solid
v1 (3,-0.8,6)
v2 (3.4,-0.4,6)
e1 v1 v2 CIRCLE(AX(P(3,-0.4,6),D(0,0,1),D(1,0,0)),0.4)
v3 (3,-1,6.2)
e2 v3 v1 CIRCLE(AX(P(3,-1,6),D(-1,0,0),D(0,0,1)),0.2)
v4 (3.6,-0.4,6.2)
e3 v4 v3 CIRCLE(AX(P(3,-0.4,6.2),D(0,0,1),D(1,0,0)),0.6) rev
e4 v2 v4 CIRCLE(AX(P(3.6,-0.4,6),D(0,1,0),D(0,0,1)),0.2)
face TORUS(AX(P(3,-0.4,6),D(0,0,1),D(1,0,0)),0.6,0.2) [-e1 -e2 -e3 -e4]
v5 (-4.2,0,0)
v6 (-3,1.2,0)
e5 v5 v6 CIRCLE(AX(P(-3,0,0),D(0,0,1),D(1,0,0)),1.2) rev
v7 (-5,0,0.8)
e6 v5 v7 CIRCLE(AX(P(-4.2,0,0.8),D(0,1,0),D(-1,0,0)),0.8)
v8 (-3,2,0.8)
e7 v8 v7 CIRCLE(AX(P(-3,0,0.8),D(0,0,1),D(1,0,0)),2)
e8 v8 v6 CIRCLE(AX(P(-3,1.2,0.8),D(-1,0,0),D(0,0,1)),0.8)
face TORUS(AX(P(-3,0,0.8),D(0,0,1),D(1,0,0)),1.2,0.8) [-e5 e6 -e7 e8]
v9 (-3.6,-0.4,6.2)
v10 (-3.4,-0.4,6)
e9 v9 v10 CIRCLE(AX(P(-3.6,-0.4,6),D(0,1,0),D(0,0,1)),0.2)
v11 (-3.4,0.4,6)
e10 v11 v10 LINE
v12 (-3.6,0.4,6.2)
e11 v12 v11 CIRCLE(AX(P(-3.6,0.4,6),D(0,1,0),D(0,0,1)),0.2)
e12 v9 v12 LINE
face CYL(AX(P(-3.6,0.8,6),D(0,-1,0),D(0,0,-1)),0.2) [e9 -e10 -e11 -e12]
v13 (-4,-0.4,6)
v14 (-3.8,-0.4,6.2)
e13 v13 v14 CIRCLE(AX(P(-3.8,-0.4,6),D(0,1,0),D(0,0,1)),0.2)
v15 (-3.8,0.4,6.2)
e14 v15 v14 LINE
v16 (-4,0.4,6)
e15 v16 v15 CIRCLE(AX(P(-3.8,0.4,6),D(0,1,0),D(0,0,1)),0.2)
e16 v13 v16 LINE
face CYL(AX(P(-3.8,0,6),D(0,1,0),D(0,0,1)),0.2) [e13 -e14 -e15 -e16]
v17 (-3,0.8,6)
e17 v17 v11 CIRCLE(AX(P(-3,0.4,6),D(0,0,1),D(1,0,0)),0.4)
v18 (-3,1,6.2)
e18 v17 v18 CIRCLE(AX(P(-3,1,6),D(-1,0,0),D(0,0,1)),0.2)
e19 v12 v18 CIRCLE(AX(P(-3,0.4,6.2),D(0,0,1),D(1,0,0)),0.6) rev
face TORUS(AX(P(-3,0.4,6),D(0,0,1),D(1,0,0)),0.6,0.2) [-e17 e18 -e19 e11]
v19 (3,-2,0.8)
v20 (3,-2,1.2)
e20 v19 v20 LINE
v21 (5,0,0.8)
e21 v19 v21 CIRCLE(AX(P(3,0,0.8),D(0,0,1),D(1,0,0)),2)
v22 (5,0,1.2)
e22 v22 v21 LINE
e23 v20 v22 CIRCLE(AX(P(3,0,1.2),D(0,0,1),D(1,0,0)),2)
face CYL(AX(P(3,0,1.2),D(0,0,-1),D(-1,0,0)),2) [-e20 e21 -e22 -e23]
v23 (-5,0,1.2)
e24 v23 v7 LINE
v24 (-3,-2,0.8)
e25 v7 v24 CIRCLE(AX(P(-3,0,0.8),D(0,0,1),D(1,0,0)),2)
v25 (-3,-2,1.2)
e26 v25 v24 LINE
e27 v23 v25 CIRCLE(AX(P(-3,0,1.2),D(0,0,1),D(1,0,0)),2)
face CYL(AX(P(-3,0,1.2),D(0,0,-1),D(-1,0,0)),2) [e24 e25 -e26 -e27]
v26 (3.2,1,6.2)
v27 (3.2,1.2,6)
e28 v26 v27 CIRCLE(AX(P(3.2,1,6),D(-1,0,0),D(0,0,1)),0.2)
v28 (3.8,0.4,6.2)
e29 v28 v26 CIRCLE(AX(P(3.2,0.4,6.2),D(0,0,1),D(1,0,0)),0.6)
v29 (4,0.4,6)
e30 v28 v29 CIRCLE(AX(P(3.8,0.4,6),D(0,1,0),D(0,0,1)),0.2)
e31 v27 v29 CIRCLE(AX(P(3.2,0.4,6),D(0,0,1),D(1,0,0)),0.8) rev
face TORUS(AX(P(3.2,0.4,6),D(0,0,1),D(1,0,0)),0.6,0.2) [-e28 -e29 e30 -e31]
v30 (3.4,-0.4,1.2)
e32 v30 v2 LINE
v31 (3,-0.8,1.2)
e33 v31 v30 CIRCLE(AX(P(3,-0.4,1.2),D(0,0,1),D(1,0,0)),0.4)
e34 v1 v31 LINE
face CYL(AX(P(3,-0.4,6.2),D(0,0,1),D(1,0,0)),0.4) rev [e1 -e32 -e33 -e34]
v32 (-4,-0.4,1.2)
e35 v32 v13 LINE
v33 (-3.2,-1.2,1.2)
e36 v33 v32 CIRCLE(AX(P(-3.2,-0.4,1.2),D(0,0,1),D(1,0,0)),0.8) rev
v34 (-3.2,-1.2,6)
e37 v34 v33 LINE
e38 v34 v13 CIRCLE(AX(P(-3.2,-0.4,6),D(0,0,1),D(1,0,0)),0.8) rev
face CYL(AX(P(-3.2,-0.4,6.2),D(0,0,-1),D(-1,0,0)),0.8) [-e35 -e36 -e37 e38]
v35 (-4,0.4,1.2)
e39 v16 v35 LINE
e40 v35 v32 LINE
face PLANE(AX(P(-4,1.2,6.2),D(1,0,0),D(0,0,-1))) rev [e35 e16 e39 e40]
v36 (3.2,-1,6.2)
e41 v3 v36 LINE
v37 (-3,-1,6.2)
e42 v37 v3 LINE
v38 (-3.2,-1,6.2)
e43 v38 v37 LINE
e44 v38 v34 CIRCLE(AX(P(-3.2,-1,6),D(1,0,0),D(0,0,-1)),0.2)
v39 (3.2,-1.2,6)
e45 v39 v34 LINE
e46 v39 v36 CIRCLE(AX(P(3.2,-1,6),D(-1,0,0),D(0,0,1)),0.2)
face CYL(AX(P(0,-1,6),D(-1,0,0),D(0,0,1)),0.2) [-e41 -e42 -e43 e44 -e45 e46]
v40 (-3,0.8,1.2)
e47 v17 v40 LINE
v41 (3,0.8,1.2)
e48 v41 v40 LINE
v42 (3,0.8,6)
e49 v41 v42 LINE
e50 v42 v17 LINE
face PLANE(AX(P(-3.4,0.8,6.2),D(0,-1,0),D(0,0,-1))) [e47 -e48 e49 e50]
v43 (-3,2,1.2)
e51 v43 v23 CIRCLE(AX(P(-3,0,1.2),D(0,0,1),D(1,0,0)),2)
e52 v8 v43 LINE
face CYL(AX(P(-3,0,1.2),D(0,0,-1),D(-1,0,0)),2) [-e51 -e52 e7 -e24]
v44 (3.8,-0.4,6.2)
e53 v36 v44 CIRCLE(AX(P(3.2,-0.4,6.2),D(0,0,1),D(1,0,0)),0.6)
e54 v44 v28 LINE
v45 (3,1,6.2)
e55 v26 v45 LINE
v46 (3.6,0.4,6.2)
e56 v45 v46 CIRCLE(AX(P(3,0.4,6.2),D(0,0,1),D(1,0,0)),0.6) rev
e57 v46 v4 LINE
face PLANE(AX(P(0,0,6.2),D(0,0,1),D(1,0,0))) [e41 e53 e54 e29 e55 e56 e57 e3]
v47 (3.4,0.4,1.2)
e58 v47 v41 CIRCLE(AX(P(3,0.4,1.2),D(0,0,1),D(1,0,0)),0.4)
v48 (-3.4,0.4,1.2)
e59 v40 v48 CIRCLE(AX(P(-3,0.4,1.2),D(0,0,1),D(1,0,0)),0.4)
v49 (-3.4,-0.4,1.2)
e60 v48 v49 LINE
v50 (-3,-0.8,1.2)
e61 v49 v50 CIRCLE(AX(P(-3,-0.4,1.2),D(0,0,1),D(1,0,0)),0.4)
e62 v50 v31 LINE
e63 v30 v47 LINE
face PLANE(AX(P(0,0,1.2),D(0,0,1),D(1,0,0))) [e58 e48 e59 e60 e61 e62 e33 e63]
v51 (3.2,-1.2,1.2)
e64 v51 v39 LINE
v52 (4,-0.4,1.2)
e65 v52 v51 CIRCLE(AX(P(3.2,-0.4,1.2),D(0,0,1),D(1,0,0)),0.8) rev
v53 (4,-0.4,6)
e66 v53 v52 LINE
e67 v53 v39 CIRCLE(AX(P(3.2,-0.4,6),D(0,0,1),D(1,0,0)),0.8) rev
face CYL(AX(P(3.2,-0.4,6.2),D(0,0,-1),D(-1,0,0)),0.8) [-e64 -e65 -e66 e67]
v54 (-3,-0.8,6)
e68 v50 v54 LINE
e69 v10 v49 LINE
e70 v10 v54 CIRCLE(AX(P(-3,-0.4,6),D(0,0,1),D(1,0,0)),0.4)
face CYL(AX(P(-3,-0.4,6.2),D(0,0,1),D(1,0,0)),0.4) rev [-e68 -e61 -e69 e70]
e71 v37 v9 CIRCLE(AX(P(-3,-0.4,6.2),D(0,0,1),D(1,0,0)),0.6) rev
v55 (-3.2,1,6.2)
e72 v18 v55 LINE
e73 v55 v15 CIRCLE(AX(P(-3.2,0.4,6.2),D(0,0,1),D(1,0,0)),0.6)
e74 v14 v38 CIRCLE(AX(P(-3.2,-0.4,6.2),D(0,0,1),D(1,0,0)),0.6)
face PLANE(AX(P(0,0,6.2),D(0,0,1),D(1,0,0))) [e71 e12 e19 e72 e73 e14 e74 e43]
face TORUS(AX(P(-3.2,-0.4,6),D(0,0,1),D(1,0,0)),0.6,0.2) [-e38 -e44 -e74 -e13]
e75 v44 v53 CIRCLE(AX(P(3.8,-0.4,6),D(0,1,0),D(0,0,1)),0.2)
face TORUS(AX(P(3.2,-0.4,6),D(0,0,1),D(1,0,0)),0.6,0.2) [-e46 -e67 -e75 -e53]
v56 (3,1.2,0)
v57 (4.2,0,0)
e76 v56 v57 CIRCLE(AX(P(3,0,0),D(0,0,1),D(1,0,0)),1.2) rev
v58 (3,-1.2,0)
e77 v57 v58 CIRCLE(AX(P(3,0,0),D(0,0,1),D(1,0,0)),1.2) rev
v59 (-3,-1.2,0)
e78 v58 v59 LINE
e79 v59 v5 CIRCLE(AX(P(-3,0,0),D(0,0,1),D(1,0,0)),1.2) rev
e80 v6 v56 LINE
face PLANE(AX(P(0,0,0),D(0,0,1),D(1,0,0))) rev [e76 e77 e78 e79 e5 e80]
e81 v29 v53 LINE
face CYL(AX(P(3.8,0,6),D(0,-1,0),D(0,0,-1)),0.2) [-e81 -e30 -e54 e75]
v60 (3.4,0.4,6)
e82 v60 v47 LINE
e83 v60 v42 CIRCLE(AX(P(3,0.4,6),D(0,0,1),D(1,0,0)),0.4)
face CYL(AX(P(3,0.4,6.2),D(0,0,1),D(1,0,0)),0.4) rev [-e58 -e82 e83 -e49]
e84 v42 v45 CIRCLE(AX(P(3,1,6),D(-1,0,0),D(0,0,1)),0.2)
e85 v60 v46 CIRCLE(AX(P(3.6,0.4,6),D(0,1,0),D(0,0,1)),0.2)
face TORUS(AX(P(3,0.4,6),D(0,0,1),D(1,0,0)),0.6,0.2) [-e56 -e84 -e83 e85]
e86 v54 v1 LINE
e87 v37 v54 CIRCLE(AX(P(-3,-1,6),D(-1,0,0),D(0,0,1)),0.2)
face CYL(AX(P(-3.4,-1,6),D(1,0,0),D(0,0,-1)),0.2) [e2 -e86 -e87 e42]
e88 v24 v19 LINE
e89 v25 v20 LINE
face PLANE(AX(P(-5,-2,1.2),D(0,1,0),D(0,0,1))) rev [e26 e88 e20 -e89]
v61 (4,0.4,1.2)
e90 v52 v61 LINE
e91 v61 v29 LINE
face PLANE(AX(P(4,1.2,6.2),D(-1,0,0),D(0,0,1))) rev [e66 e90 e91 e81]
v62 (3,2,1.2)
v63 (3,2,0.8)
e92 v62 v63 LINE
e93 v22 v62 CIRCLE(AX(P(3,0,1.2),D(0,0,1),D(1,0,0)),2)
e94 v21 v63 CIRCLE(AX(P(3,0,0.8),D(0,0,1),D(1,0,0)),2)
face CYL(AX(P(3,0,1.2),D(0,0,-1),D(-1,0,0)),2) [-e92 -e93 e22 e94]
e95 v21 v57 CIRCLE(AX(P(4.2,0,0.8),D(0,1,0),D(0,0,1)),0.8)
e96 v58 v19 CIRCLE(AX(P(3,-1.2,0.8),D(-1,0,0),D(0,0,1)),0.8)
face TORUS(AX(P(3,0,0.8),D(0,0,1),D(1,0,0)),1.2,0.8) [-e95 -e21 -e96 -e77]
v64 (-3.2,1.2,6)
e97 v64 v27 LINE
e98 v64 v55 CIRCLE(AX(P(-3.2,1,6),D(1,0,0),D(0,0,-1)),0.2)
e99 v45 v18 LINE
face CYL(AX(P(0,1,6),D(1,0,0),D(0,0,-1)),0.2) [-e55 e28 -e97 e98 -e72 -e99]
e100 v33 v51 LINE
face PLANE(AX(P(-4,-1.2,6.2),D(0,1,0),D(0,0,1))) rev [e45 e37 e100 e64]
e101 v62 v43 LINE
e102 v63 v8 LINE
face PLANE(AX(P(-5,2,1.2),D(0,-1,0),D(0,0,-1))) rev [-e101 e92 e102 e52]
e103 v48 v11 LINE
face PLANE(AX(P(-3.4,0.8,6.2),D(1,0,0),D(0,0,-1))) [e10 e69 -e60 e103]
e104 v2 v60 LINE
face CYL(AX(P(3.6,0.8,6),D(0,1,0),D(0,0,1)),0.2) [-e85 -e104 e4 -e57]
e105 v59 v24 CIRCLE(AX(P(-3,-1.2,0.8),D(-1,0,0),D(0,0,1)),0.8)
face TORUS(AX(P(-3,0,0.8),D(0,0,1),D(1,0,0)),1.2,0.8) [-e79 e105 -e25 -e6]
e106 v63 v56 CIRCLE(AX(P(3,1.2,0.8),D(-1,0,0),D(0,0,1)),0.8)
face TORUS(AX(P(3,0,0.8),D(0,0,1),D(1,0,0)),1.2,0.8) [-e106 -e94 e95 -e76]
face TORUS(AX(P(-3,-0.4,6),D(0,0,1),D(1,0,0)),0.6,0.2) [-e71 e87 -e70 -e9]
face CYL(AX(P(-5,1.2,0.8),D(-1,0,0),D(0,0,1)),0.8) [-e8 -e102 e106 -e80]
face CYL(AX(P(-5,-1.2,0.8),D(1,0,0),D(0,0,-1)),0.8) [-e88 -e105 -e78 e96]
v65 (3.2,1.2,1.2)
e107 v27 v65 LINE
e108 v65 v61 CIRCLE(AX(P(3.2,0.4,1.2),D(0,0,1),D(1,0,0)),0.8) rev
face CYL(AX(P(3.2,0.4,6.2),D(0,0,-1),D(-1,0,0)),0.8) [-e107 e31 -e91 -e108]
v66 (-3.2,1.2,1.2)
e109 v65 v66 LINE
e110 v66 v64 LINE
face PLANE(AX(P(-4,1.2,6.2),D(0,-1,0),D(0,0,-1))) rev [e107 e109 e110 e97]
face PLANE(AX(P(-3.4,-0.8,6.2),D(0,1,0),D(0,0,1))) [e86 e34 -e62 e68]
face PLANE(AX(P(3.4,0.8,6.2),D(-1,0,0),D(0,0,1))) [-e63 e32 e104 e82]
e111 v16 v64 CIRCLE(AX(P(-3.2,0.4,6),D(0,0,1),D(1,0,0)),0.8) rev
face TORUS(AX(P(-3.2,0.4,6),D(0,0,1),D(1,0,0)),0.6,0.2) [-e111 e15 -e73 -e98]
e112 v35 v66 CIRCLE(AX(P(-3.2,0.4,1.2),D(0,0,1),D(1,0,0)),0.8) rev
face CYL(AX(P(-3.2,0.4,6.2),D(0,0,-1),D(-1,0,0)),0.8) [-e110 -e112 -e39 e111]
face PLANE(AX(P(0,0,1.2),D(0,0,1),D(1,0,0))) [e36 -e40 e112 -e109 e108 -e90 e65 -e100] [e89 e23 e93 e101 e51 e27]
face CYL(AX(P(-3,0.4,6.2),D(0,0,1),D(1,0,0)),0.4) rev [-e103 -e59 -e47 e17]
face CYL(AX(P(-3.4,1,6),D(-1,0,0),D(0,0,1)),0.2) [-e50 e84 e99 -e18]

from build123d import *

# Parameters (mm, degrees)
SKETCH_1_W      = 10
SKETCH_1_H      = 4
EXTRUDE_1_DEPTH = 1.2
SKETCH_2_W      = 8
SKETCH_2_H      = 2.4
SKETCH_2_W_2    = 6.8
SKETCH_2_H_2    = 1.6
EXTRUDE_2_DEPTH = 5
FILLET_1_R      = 2
FILLET_2_R      = 0.8
FILLET_3_R      = 0.8
FILLET_4_R      = 0.4
FILLET_5_R      = 0.2


with BuildPart() as part:
    # Эскиз1 → Бобышка-Вытянуть1 (new body)
    with BuildSketch(Plane.XY):
        Rectangle(SKETCH_1_W, SKETCH_1_H)
    extrude(amount=EXTRUDE_1_DEPTH)

    # Эскиз2 → Бобышка-Вытянуть2 (add)
    with BuildSketch(Plane.XY.offset(1.2)):
        Rectangle(SKETCH_2_W, SKETCH_2_H)
        Rectangle(SKETCH_2_W_2, SKETCH_2_H_2, mode=Mode.SUBTRACT)
    extrude(amount=EXTRUDE_2_DEPTH)

    # Скругление1
    fillet_1_edges = [part.edges().sort_by_distance(p)[0] for p in [
        (5, 2, 0.6),
        (5, -2, 0.6),
        (-5, -2, 0.6),
        (-5, 2, 0.6),
    ]]
    fillet(fillet_1_edges, radius=FILLET_1_R - 0.0001)  # a hair under: the kernel refuses the full size

    # Скругление2
    fillet_2_edges = [part.edges().sort_by_distance(p)[0] for p in [
        (0, 2, 0),
        (0, -2, 0),
        (-4.414242852, 1.414242852, 0),
        (-4.414242852, -1.414242852, 0),
        (4.414242852, -1.414242852, 0),
        (4.414242852, 1.414242852, 0),
    ]]
    fillet(fillet_2_edges, radius=FILLET_2_R)

    # Скругление3
    fillet_3_edges = [part.edges().sort_by_distance(p)[0] for p in [
        (4, -1.2, 3.7),
        (4, 1.2, 3.7),
        (-4, 1.2, 3.7),
        (-4, -1.2, 3.7),
    ]]
    fillet(fillet_3_edges, radius=FILLET_3_R)

    # Скругление4
    fillet_4_edges = [part.edges().sort_by_distance(p)[0] for p in [
        (3.4, 0.8, 3.7),
        (-3.4, 0.8, 3.7),
        (-3.4, -0.8, 3.7),
        (3.4, -0.8, 3.7),
    ]]
    fillet(fillet_4_edges, radius=FILLET_4_R)

    # Скругление5
    fillet_5_edges = [part.edges().sort_by_distance(p)[0] for p in [
        (-3.4, 0, 6.2),
        (0, -0.8, 6.2),
        (3.4, 0, 6.2),
        (0, 0.8, 6.2),
        (-3.282842712, -0.682842712, 6.2),
        (3.282842712, -0.682842712, 6.2),
        (3.282842712, 0.682842712, 6.2),
        (-3.282842712, 0.682842712, 6.2),
        (0, -1.2, 6.2),
        (-4, 0, 6.2),
        (4, 0, 6.2),
        (0, 1.2, 6.2),
        (-3.765685425, 0.965685425, 6.2),
        (3.765685425, 0.965685425, 6.2),
        (3.765685425, -0.965685425, 6.2),
        (-3.765685425, -0.965685425, 6.2),
    ]]
    fillet(fillet_5_edges, radius=FILLET_5_R - 0.0001)  # a hair under: the kernel refuses the full size


solid = part.part
